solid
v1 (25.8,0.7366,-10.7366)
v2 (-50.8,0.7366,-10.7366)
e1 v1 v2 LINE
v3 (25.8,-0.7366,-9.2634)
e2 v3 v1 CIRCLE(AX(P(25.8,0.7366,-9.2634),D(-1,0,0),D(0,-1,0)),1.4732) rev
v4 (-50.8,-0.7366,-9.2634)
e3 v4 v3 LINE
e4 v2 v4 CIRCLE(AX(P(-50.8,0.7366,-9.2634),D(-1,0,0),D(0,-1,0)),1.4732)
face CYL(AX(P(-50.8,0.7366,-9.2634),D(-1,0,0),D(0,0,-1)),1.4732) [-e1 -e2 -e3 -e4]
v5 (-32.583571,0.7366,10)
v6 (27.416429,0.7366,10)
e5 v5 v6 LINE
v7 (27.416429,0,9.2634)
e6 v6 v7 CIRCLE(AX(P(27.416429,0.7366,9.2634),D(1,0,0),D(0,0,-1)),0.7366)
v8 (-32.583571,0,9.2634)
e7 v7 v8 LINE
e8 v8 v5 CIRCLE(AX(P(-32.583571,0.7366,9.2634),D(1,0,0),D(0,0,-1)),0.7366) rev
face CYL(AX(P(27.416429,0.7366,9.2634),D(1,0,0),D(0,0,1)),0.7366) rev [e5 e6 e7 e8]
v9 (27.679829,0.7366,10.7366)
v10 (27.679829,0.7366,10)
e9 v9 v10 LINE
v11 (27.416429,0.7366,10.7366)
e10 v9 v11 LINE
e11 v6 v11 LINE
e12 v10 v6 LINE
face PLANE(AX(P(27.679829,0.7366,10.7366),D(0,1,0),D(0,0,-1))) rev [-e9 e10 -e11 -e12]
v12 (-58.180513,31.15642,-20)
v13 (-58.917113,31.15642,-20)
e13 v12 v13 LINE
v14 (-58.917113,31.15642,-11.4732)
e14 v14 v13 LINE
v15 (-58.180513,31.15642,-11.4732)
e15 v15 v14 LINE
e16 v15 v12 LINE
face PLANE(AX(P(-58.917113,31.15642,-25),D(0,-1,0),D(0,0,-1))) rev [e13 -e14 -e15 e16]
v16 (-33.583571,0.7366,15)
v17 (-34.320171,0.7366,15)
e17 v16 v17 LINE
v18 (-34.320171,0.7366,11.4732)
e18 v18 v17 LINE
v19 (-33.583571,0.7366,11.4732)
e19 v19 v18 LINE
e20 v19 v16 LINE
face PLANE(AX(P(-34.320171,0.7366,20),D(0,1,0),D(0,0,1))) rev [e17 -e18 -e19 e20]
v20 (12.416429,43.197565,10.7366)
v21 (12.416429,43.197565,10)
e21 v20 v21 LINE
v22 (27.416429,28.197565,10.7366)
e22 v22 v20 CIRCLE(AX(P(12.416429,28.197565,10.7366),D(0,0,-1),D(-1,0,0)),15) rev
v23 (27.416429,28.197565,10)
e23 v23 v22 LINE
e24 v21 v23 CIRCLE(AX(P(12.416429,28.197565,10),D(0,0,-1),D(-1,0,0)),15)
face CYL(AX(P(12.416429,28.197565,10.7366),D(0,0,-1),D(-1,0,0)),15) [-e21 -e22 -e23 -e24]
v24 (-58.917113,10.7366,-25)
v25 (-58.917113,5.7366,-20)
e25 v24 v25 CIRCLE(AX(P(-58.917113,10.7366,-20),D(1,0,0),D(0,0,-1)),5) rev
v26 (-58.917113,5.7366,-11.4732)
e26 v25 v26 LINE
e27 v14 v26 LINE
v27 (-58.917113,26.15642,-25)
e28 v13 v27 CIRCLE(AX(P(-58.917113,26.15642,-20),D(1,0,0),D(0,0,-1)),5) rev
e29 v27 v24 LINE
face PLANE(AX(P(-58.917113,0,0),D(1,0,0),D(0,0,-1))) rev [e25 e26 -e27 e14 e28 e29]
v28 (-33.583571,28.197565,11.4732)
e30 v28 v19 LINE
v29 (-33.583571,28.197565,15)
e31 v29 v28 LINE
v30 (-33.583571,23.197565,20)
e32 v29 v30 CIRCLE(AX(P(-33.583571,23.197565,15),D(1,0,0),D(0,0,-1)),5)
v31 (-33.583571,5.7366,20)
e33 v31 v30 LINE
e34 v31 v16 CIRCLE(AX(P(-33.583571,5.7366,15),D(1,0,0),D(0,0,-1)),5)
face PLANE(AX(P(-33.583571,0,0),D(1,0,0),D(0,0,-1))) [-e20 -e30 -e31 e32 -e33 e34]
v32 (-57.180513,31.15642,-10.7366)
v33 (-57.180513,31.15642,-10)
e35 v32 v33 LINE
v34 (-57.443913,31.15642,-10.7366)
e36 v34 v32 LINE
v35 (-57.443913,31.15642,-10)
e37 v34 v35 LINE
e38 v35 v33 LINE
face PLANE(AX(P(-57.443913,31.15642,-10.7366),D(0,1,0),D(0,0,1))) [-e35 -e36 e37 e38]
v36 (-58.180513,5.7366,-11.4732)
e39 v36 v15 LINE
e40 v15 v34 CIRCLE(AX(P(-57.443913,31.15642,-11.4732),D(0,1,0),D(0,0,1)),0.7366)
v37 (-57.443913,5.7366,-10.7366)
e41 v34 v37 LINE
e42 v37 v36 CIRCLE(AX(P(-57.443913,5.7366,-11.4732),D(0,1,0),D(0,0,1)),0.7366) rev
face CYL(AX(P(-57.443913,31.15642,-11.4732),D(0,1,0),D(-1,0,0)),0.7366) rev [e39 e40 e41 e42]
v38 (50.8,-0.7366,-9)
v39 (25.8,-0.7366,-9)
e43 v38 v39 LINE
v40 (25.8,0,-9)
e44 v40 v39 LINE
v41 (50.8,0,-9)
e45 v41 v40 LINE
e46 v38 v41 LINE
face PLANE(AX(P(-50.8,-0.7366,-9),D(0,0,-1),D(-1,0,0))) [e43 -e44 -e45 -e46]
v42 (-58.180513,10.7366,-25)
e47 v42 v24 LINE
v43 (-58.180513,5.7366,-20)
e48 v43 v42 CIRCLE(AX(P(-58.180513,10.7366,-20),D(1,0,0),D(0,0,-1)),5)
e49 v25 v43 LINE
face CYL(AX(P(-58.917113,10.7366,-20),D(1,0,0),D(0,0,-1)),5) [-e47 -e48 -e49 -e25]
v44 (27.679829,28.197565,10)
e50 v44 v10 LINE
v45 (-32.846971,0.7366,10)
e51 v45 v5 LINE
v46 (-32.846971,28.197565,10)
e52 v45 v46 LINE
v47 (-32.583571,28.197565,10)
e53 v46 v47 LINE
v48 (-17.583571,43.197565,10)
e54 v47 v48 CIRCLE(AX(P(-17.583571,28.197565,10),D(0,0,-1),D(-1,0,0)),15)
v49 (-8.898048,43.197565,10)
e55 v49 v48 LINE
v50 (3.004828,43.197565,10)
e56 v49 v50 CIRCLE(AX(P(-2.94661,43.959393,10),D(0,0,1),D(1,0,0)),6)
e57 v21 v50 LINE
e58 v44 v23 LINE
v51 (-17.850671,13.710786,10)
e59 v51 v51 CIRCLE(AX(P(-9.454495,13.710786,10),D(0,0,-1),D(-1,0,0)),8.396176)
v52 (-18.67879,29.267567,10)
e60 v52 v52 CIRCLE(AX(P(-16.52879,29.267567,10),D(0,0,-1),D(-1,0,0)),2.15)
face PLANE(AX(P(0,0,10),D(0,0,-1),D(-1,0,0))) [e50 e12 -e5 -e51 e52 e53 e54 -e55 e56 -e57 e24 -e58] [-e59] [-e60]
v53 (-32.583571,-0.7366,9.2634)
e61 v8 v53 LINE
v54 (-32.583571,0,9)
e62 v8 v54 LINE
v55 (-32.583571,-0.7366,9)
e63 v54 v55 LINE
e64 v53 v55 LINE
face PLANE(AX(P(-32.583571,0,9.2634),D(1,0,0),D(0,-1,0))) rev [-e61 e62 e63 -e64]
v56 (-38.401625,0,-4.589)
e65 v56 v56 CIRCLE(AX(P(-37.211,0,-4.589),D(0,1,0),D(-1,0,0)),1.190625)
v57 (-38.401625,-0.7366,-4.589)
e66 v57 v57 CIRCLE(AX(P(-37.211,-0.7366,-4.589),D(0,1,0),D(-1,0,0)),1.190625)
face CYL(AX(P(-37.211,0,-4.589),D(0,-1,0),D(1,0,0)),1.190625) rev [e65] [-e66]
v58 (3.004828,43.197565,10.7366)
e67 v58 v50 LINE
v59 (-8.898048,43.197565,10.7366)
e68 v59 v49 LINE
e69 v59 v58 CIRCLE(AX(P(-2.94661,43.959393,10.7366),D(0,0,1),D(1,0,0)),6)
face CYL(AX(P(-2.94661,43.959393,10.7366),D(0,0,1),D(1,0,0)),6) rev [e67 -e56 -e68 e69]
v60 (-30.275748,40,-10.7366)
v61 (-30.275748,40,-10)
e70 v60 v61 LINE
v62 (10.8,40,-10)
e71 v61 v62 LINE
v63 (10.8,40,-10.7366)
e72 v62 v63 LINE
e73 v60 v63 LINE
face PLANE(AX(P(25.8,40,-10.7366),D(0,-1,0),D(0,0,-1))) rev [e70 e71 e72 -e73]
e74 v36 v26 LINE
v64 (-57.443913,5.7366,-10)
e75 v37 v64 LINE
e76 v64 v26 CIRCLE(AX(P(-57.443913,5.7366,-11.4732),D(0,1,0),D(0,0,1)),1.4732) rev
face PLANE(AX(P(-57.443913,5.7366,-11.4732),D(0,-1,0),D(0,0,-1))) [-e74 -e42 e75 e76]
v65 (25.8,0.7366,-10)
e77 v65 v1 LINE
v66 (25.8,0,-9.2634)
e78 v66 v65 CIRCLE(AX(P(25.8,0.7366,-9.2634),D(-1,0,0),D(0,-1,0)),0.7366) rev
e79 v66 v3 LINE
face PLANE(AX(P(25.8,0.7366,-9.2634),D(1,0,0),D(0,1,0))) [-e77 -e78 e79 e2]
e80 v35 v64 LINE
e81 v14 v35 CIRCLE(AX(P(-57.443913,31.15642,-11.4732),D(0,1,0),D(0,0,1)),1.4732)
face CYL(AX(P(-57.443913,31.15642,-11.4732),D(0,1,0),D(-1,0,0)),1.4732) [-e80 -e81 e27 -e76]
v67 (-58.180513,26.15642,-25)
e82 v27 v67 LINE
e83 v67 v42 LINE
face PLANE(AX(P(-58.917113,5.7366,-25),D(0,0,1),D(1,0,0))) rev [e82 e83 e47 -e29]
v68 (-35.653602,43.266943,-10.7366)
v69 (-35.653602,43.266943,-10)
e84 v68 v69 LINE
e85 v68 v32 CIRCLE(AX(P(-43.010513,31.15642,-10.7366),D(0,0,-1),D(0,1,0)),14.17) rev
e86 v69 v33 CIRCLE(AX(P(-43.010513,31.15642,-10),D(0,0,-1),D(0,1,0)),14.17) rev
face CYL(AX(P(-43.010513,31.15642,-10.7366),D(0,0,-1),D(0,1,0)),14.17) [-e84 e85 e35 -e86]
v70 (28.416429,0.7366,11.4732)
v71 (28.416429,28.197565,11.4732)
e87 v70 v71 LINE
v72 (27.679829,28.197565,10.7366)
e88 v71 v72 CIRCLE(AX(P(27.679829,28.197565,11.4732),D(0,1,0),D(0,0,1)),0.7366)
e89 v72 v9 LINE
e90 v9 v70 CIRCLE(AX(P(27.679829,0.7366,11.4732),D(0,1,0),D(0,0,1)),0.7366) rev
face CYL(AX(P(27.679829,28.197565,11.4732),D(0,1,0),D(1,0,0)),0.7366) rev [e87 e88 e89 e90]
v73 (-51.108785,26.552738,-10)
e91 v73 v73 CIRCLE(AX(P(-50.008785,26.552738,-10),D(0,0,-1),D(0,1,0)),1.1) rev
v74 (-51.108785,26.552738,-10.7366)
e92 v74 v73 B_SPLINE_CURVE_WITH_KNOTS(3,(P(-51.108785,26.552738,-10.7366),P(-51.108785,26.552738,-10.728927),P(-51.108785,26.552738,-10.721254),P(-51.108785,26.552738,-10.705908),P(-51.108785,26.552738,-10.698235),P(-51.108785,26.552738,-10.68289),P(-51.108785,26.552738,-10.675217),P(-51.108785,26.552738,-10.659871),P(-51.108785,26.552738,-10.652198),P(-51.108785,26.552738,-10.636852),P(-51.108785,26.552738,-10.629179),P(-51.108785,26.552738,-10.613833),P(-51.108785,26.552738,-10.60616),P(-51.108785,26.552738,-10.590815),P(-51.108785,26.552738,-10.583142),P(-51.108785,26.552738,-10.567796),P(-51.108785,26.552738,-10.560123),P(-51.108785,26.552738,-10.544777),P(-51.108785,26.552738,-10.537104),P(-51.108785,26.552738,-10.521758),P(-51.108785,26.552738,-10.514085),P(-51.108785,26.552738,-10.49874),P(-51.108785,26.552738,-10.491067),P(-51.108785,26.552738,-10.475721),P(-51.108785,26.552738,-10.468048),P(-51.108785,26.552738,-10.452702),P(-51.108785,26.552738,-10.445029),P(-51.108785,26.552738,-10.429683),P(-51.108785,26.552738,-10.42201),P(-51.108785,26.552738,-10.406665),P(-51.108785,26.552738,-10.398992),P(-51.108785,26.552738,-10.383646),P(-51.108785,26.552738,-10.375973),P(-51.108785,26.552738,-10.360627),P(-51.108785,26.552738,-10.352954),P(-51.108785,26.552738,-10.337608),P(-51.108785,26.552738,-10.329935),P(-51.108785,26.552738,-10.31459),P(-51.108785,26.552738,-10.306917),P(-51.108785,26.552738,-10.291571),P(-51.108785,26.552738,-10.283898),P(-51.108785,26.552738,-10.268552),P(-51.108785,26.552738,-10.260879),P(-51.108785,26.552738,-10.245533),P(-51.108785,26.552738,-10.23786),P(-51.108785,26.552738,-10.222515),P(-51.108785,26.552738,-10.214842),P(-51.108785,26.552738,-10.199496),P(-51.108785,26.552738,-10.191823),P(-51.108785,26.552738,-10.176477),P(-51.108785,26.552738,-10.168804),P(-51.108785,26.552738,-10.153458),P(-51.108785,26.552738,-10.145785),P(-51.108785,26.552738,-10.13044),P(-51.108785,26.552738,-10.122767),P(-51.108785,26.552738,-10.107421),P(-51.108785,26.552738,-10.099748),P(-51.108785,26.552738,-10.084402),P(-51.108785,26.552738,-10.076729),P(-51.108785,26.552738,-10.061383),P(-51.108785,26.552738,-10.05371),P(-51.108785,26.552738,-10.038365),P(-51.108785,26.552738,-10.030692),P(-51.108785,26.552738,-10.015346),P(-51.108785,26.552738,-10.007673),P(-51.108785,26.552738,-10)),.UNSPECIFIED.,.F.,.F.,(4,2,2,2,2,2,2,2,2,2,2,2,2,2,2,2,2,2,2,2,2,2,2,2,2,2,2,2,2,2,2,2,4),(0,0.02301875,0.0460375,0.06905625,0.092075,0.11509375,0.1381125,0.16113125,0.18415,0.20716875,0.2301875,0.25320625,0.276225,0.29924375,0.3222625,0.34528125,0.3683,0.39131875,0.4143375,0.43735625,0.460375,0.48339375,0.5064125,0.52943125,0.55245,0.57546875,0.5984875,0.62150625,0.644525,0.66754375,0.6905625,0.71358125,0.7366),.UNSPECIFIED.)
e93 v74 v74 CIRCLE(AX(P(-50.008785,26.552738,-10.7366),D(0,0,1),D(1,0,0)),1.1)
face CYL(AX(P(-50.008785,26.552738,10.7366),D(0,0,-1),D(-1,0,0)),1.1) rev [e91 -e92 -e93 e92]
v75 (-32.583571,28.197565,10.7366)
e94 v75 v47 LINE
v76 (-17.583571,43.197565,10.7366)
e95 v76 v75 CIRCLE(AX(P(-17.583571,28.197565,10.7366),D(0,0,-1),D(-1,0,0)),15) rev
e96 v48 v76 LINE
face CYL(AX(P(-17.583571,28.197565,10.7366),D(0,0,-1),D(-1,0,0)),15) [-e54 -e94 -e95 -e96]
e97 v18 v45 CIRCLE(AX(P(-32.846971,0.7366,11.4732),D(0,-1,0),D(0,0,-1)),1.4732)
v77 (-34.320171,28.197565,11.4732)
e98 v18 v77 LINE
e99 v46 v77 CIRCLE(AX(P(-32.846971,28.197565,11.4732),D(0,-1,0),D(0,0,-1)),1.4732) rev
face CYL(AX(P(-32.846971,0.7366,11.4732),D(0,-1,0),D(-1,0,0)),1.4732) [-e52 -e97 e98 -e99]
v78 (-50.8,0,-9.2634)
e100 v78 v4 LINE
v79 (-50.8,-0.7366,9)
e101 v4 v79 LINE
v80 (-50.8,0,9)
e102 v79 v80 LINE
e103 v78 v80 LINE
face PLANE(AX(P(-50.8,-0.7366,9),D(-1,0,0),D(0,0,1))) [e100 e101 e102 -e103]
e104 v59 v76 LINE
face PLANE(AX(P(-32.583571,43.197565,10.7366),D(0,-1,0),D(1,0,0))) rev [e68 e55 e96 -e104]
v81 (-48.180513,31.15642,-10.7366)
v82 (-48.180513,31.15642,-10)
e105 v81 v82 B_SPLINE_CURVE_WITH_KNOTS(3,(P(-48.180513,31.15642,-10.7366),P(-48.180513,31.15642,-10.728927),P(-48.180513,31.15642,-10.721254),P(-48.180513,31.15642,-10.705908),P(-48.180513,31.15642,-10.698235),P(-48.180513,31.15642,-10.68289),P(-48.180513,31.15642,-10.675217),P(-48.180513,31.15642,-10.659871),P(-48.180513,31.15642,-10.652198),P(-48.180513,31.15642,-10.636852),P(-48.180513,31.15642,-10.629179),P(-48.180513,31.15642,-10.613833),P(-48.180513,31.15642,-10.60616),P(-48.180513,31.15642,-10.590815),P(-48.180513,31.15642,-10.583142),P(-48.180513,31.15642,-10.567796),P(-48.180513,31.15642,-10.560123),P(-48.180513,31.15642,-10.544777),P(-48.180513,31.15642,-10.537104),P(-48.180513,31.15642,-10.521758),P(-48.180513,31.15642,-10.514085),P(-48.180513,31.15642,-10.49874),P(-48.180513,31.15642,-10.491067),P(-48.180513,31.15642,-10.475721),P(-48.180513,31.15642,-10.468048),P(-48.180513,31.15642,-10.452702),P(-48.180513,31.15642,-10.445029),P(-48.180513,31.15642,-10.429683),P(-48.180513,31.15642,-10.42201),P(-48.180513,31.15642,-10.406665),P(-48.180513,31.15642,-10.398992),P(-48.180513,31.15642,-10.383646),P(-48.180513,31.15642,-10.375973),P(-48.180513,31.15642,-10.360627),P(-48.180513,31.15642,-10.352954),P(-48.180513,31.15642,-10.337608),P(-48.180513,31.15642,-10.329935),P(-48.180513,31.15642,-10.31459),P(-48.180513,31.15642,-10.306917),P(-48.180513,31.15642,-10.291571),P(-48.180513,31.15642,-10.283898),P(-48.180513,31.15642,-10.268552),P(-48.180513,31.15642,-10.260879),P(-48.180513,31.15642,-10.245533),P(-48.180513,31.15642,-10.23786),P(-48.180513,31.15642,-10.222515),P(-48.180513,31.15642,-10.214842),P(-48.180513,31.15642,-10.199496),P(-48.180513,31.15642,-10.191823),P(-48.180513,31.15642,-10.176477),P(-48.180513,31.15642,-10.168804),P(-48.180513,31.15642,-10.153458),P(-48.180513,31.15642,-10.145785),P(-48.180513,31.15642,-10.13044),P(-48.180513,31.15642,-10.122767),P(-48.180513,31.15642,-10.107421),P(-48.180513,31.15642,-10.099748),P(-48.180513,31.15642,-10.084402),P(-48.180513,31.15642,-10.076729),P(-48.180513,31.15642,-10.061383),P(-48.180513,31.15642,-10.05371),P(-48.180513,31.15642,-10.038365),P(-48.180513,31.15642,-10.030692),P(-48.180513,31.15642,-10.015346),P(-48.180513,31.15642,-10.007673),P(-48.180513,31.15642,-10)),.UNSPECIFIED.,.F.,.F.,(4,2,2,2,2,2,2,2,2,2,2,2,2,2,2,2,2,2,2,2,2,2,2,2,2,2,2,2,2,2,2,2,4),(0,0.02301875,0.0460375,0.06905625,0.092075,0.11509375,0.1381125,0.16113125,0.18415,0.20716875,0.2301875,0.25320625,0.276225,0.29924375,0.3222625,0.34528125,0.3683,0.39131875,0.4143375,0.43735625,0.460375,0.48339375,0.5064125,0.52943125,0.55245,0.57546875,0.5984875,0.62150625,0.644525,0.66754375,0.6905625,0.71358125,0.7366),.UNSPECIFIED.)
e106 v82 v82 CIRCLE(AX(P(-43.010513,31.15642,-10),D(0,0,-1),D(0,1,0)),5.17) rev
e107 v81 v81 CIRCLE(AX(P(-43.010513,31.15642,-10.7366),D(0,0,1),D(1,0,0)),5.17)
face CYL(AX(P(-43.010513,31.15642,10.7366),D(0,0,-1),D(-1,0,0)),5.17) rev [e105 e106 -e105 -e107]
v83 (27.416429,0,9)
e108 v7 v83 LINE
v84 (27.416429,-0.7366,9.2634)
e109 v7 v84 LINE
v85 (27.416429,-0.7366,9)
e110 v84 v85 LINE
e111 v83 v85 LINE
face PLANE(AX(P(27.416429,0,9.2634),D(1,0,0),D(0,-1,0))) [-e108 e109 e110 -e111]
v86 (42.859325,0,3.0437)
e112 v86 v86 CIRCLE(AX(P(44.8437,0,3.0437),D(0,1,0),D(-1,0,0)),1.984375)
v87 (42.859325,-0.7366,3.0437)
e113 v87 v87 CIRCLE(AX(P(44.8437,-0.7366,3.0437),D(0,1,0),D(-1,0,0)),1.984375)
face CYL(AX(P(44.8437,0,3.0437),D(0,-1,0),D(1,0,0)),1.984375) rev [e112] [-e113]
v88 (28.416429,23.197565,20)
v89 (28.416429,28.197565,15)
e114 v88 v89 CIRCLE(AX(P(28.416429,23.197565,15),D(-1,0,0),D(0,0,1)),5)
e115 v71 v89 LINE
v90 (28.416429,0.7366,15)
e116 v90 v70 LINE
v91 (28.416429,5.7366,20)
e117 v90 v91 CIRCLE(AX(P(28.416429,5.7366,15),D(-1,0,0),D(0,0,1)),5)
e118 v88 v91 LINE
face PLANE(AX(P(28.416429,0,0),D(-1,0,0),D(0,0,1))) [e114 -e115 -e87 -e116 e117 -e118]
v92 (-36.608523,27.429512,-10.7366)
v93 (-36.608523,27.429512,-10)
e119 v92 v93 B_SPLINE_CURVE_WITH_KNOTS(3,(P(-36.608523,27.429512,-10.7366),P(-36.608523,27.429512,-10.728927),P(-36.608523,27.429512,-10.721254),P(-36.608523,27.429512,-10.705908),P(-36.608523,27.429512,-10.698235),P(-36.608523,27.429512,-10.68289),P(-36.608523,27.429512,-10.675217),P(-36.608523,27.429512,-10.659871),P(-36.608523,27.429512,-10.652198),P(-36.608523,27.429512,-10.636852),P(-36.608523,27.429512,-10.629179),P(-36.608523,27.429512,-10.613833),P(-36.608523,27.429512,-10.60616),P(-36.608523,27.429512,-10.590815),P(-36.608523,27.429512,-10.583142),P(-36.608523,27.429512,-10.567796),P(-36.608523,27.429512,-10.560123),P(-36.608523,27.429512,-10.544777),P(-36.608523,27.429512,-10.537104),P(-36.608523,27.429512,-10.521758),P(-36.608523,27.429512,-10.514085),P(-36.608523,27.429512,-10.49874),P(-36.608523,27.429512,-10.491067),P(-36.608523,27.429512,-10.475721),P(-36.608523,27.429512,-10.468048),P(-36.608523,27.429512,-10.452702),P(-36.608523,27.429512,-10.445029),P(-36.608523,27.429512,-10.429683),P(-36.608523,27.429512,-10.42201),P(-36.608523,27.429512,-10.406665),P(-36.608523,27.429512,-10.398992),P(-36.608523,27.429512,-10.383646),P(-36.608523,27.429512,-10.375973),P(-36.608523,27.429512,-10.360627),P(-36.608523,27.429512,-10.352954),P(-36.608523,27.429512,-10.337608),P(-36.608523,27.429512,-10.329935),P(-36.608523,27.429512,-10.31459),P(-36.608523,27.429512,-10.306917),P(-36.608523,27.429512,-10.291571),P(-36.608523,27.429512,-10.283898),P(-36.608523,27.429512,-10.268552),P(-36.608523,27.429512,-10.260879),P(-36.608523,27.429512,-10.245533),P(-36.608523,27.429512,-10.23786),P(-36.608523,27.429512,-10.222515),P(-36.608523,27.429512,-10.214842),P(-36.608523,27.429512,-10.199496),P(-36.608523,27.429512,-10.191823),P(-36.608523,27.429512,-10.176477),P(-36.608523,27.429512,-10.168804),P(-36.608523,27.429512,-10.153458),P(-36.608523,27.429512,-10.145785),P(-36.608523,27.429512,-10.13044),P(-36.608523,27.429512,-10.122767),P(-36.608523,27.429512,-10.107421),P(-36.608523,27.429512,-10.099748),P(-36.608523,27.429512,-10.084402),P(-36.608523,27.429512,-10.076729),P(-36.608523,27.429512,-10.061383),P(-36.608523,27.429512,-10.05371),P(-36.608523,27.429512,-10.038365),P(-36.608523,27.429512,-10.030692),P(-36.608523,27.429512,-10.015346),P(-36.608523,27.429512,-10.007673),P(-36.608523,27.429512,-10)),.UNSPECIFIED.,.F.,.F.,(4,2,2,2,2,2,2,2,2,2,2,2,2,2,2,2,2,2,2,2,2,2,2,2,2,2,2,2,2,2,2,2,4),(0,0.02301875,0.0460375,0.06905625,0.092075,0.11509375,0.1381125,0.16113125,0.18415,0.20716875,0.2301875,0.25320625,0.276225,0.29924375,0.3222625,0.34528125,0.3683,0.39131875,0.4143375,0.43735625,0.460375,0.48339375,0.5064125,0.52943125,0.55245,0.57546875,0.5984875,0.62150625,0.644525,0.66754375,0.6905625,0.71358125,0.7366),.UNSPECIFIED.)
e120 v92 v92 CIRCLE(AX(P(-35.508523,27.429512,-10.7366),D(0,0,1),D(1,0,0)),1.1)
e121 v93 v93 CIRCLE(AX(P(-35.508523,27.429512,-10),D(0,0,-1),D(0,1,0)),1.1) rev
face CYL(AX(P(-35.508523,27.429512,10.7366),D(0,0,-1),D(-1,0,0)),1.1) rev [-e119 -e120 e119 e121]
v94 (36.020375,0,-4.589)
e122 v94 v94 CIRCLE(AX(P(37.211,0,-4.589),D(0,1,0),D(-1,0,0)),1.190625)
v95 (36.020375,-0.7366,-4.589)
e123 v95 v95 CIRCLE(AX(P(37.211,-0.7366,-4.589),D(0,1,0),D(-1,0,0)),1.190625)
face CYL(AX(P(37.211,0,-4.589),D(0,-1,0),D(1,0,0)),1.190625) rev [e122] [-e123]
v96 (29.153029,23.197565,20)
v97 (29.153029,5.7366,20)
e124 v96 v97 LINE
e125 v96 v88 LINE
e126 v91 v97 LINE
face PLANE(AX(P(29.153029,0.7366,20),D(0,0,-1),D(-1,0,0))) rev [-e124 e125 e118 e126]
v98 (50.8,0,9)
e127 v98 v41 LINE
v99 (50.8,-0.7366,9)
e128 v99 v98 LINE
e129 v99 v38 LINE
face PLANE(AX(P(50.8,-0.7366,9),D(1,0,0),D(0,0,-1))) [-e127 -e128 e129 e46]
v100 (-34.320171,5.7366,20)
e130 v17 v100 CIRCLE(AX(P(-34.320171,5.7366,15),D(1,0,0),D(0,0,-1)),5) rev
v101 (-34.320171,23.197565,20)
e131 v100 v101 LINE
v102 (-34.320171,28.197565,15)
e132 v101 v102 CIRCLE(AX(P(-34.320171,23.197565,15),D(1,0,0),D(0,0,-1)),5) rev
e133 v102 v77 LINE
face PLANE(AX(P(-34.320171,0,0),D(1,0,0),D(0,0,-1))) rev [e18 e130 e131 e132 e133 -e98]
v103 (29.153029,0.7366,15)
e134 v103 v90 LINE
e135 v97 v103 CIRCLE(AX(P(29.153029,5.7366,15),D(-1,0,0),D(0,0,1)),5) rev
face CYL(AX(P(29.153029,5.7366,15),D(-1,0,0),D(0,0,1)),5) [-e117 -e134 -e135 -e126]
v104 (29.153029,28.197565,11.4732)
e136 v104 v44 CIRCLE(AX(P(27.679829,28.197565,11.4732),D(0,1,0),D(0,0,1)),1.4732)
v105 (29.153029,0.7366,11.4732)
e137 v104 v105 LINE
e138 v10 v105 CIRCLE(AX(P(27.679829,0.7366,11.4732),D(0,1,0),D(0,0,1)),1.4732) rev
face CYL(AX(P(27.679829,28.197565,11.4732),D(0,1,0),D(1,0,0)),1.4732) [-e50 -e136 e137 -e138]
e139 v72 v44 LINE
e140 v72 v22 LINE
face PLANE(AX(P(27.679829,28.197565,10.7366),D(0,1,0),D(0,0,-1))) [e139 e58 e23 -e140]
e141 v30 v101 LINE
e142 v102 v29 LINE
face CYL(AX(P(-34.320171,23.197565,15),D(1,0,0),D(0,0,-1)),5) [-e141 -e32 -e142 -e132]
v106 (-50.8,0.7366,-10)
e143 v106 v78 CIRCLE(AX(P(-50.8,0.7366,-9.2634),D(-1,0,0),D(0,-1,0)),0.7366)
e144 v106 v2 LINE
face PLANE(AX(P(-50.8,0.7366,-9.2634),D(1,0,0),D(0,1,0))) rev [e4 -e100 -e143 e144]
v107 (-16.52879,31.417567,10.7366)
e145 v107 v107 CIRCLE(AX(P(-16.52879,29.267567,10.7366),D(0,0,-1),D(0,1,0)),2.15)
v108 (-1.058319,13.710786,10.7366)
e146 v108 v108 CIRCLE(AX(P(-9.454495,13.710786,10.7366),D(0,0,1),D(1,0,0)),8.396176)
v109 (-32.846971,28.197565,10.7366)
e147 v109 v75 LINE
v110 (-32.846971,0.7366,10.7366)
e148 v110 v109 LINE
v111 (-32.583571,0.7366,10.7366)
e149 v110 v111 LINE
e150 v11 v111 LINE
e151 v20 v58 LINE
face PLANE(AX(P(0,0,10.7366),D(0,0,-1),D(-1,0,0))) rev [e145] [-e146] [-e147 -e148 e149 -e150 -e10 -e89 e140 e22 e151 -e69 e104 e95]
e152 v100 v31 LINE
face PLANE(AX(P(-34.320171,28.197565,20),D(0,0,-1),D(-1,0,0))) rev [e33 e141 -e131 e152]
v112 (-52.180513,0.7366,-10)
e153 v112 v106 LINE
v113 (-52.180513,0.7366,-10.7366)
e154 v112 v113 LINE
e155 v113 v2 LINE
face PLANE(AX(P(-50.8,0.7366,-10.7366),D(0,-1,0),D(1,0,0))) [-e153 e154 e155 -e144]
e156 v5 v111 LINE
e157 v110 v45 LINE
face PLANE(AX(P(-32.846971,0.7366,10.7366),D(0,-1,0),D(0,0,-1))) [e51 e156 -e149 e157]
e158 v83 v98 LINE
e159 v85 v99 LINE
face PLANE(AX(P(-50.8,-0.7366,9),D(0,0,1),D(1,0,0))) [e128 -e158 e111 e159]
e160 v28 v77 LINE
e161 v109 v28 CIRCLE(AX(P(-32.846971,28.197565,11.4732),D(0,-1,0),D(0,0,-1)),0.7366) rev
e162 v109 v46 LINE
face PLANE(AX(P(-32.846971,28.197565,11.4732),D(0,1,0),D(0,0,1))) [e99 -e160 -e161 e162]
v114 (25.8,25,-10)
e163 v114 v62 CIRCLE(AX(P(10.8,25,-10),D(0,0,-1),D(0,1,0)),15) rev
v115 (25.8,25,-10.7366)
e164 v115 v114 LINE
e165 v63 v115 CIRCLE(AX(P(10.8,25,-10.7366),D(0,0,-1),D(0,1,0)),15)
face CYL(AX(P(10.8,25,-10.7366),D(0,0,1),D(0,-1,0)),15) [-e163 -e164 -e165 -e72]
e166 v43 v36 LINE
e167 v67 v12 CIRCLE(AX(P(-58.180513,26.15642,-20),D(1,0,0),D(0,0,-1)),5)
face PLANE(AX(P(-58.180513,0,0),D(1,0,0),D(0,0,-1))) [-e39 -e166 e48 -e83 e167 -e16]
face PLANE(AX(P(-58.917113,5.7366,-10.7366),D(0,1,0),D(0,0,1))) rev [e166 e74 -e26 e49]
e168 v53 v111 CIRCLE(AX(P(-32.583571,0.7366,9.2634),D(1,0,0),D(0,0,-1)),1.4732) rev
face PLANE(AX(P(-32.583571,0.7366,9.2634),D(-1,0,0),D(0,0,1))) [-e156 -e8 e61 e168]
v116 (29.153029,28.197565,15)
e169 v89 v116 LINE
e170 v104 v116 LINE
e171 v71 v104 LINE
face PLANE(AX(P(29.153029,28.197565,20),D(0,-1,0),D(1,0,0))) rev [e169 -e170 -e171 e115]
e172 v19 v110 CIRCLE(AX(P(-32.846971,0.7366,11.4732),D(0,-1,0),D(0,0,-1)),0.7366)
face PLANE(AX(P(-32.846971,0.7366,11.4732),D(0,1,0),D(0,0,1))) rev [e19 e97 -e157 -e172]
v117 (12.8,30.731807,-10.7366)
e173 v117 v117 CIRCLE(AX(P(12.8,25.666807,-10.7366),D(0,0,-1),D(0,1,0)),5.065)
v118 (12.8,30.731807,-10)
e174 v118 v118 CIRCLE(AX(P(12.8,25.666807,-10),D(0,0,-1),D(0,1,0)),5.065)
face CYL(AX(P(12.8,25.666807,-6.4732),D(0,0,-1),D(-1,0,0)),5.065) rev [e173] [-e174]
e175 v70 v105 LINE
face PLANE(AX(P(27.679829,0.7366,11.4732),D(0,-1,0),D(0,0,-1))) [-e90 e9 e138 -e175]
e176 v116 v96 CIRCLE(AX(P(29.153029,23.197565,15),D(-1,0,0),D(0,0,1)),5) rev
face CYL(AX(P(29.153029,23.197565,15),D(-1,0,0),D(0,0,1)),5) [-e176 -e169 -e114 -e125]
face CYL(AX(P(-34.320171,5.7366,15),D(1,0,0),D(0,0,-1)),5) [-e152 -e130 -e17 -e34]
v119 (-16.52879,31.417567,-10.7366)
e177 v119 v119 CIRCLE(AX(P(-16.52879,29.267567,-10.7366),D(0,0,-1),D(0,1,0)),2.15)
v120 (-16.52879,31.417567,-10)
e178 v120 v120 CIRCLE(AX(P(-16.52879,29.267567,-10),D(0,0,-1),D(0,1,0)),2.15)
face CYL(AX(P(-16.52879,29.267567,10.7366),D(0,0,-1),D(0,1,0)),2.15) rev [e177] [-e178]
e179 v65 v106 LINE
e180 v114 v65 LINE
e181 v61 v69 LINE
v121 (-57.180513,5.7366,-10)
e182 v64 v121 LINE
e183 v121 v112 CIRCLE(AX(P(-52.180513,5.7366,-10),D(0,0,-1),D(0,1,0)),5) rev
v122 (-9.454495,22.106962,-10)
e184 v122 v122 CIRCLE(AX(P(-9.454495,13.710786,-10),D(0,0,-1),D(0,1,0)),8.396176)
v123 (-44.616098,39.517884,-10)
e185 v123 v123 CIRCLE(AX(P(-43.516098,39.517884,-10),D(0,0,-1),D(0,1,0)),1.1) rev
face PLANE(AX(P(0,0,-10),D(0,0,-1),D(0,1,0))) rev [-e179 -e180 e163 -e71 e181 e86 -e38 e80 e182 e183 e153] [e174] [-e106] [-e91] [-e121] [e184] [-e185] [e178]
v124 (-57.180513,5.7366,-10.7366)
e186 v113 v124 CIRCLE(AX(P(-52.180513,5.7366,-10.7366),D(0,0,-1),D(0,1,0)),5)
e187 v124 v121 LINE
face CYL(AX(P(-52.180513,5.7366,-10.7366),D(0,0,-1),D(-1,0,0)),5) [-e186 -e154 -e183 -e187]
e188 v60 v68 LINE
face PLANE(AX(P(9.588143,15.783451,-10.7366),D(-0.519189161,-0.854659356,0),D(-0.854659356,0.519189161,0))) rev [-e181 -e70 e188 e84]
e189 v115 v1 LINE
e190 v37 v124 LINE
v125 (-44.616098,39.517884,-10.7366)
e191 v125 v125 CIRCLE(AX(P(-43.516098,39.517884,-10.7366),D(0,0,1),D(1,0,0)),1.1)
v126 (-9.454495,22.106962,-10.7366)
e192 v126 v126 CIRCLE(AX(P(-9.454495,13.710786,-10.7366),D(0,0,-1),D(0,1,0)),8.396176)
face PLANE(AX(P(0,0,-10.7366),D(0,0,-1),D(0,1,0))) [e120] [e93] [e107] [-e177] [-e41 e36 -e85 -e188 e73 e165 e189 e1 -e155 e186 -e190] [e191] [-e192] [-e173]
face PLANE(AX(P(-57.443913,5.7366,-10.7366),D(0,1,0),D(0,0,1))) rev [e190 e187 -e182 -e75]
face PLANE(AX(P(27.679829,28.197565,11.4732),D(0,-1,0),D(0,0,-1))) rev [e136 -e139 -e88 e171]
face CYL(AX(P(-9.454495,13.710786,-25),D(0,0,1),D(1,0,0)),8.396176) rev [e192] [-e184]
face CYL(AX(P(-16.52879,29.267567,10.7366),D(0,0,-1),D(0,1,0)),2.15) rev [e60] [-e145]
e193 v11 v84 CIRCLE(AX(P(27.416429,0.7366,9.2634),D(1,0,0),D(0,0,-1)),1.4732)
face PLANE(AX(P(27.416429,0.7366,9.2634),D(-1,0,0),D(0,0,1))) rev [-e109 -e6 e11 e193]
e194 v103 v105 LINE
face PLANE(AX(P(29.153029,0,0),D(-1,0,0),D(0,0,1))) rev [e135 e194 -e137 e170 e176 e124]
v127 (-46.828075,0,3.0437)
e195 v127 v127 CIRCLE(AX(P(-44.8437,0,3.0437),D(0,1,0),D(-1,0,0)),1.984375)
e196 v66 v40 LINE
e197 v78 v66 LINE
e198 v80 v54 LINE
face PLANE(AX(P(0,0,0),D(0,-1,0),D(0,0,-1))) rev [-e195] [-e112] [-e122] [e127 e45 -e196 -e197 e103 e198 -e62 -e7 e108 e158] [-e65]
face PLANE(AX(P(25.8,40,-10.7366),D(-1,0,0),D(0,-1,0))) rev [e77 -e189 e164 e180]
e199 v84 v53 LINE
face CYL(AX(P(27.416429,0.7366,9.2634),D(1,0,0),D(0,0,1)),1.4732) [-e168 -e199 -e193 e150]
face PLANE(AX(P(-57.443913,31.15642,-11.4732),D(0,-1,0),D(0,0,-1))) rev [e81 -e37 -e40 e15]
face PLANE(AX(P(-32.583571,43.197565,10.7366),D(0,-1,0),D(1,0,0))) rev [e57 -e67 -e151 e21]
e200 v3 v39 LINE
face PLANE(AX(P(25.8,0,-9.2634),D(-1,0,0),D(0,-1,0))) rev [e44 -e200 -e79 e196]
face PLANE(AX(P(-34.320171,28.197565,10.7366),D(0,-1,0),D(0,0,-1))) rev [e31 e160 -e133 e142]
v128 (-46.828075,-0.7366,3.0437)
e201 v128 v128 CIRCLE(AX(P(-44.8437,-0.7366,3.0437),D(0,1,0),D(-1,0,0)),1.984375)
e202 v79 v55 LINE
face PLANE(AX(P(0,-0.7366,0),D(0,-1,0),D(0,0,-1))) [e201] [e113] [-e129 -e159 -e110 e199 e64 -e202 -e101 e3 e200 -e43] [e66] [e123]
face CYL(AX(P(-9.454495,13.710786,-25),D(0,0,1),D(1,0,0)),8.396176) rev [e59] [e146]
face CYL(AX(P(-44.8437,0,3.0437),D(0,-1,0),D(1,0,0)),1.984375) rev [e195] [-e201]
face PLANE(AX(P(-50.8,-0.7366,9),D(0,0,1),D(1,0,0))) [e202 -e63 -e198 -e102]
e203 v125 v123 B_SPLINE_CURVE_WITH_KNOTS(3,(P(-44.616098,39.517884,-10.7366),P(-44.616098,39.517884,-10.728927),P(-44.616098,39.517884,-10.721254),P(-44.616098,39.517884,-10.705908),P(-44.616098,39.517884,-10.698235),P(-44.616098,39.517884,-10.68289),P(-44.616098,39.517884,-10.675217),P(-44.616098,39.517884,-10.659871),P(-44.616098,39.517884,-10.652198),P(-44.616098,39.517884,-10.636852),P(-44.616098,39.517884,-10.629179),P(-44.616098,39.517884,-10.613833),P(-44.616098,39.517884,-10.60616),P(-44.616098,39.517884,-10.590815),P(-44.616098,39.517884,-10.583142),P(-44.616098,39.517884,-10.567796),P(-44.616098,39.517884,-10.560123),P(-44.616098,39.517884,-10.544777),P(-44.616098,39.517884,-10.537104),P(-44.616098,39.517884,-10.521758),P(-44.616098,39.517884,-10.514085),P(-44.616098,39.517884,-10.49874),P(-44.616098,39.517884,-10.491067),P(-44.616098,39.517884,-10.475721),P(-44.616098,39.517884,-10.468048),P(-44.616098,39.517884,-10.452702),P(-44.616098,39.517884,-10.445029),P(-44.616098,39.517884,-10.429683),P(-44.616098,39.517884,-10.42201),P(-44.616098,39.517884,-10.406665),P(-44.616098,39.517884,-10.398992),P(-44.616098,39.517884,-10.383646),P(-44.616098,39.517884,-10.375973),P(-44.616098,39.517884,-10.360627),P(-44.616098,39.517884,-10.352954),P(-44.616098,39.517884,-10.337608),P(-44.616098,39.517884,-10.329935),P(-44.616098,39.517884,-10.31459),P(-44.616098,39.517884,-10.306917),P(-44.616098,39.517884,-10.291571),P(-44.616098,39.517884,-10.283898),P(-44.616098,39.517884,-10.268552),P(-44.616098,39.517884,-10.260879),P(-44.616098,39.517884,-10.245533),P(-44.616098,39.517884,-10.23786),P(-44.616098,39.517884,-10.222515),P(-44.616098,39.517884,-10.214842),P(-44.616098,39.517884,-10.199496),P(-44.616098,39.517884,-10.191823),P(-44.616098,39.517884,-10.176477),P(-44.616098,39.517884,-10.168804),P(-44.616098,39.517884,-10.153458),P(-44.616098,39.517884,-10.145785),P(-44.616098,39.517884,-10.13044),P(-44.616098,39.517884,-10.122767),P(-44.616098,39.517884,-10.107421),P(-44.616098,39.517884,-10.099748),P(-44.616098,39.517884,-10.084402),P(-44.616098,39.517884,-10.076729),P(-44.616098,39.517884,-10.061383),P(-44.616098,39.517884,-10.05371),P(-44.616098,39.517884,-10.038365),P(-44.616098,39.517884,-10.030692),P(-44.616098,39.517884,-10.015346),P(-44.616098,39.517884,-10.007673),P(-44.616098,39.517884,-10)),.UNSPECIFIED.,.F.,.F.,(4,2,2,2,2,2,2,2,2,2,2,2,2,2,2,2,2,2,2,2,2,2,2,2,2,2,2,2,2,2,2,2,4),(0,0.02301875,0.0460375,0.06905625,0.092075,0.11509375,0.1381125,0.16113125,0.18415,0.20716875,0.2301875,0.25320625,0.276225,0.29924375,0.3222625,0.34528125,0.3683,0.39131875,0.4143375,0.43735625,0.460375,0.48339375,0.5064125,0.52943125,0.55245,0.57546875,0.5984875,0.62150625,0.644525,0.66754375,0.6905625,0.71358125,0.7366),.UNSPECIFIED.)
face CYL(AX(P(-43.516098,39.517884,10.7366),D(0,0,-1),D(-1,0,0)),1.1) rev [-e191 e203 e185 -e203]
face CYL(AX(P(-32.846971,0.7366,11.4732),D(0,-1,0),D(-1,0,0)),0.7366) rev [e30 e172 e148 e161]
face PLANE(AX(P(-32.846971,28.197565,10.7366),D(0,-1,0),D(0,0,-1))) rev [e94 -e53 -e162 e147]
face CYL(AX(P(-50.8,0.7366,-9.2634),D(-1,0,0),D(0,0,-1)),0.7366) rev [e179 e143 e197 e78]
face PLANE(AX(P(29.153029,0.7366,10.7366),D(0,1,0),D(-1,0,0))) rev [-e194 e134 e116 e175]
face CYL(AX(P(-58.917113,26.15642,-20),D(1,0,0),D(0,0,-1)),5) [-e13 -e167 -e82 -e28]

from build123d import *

# Parameters (mm, degrees)
SKETCH1_W                = 101.6
SKETCH1_H                = 18
BASE_FLANGE1_DEPTH       = 0.7366
CUT_EXTRUDE1_DEPTH       = 248.362817644
CUT_EXTRUDE1_DEPTH_BACK  = 248.362817644
SKETCH9_R                = 1.984375
SKETCH9_R_2              = 1.190625
EDGE_FLANGE2_DEPTH       = 60
CUT_EXTRUDE10_DEPTH      = 276.770749451
CUT_EXTRUDE10_DEPTH_BACK = 276.770749451
SKETCH47_R               = 5.065
SKETCH48_R               = 6
CUT_EXTRUDE11_DEPTH      = 10
EDGE_FLANGE4_DEPTH       = 76.6
EDGE_FLANGE4_START       = 0.7366
EDGE_FLANGE4_FLAT_DEPTH  = 0.7366
CUT_EXTRUDE12_DEPTH      = 105.880550385
CUT_EXTRUDE12_DEPTH_BACK = 105.880550385
SKETCH52_R               = 2.15
TAB1_START               = -0.7366
TAB1_OUTLINE_W           = 10
TAB1_OUTLINE_H           = 49.408594005
TAB1_DEPTH               = 0.7366
SKETCH56_R               = 5.065
CUT_EXTRUDE13_DEPTH      = 5
CUT_EXTRUDE16_DEPTH      = 105.732220975
CUT_EXTRUDE16_DEPTH_BACK = 105.732220975
SKETCH59_R               = 1.1
SKETCH59_R_2             = 5.17
CUT_EXTRUDE18_DEPTH      = 10
FILLET1_R                = 5
EDGE_FLANGE5_DEPTH       = 25.419820015
FILLET2_R                = 5
FILLET3_R                = 15
EDGE_FLANGE6_DEPTH       = 27.460964596
EDGE_FLANGE6_BEND_DEPTH  = 27.460964596
FILLET4_R                = 5
SKETCH71_R               = 8.39617584
CUT_EXTRUDE19_DEPTH      = 83.479179892


# Read off the part's stored shape, not the designer's step: Tab1
# Sheet-metal steps are written as plain solids
with BuildPart() as part:
    # Sketch1 → Base-Flange1 (new body)
    with BuildSketch(Plane(origin=(0, 0, 0), x_dir=(1, 0, 0), z_dir=(0, 1, 0))):
        Rectangle(SKETCH1_W, SKETCH1_H)
    extrude(amount=-BASE_FLANGE1_DEPTH)

    # Sketch9 → Cut-Extrude1 (cut, two sides: drawn at the far end of the back side and taken through both)
    with BuildSketch(Plane(origin=(-165.711822879, -0.7366, -110.626299478), x_dir=(0.7071067811865437, 0, -0.7071067811865515), z_dir=(0, 1, 0)).offset(-CUT_EXTRUDE1_DEPTH_BACK)):
        with Locations(Location((5.089841868, -165.843496765, 0), (0, 0, 135))):
            Circle(SKETCH9_R)
        with Locations(Location((15.884109726, -165.843496765, 0), (0, 0, 135))):
            Circle(SKETCH9_R_2)
        with Locations(Location((68.508410595, -229.262065492, 0), (0, 0, 135))):
            Circle(SKETCH9_R)
        with Locations(Location((68.508410595, -218.467797635, 0), (0, 0, 135))):
            Circle(SKETCH9_R_2)
    extrude(amount=CUT_EXTRUDE1_DEPTH + CUT_EXTRUDE1_DEPTH_BACK, mode=Mode.SUBTRACT)

    # Edge-Flange2 section (across the edge) → Edge-Flange2 (add)
    with BuildSketch(Plane(origin=(-32.583570882, 0, 10), x_dir=(0, 0, -1), z_dir=(1, 0, 0))):
        with BuildLine():
            Line((-0.7366, 0.7366), (-0.7366, 43.197564596))
            Line((-0.7366, 43.197564596), (0, 43.197564596))
            Line((0, 43.197564596), (0, 0.7366))
            ThreePointArc((0, 0.7366), (0.215745145, 0.215745145), (0.7366, 0))
            Line((0.7366, 0), (1, 0))
            Line((1, 0), (1, -0.7366))
            Line((1, -0.7366), (0.7366, -0.7366))
            ThreePointArc((0.7366, -0.7366), (-0.30510971, -0.30510971), (-0.7366, 0.7366))
        make_face()
    extrude(amount=EDGE_FLANGE2_DEPTH)

    # Sketch47 → Cut-Extrude10 (cut, two sides: drawn at the far end of the back side and taken through both)
    with BuildSketch(Plane(origin=(-165.711822879, -125.530580752, -15.7766), x_dir=(1, 0, 0), z_dir=(0, 0, 1)).offset(-CUT_EXTRUDE10_DEPTH_BACK)):
        with Locations((162.765212711, 169.489973714)):
            Circle(SKETCH47_R)
    extrude(amount=CUT_EXTRUDE10_DEPTH + CUT_EXTRUDE10_DEPTH_BACK, mode=Mode.SUBTRACT)

    # Sketch48 → Cut-Extrude11 (cut)
    with BuildSketch(Plane.XY.offset(10.7366)):
        with Locations((-2.946610168, 43.959392962)):
            Circle(SKETCH48_R)
    extrude(amount=-CUT_EXTRUDE11_DEPTH, mode=Mode.SUBTRACT)

    # Edge-Flange4 bend section (across the edge) → Edge-Flange4 (add)
    with BuildSketch(Plane(origin=(25.8, 0, -10), x_dir=(0, 0, 1), z_dir=(-1, 0, 0))):
        with BuildLine():
            Line((-0.7366, 0.7366), (0, 0.7366))
            ThreePointArc((0, 0.7366), (0.215745145, 0.215745145), (0.7366, 0))
            Line((0.7366, 0), (1, 0))
            Line((1, 0), (1, -0.7366))
            Line((1, -0.7366), (0.7366, -0.7366))
            ThreePointArc((0.7366, -0.7366), (-0.30510971, -0.30510971), (-0.7366, 0.7366))
        make_face()
    extrude(amount=EDGE_FLANGE4_DEPTH)

    # Edge-Flange4 profile (on flange) → Edge-Flange4 flat (add)
    with BuildSketch(Plane(origin=(0, 0, -10), x_dir=(-1, 0, 0), z_dir=(0, 0, -1)).offset(EDGE_FLANGE4_START)):
        Polygon((-25.8, 40), (-25.8, 0.7366), (50.8, 0.7366), (50.8, 40), (50.8, 50.145194005), (30.27574847, 50.145194005), (30.27574847, 40), align=None)
    extrude(amount=-EDGE_FLANGE4_FLAT_DEPTH)

    # Sketch52 → Cut-Extrude12 (cut, two sides: drawn at the far end of the back side and taken through both)
    with BuildSketch(Plane(origin=(-25.053389833, -19.029185513, -10.7366), x_dir=(-1, 0, 0), z_dir=(0, 0, -1)).offset(-CUT_EXTRUDE12_DEPTH_BACK)):
        with Locations(Location((-8.524599638, 48.296752149, 0), (0, 0, 90))):
            Circle(SKETCH52_R)
    extrude(amount=CUT_EXTRUDE12_DEPTH + CUT_EXTRUDE12_DEPTH_BACK, mode=Mode.SUBTRACT)

    # Tab1 outline → Tab1 (add)
    with BuildSketch(Plane.XY.offset(-10).offset(TAB1_START)):
        with Locations((-55.8, 25.440897003)):
            Rectangle(TAB1_OUTLINE_W, TAB1_OUTLINE_H)
    extrude(amount=TAB1_DEPTH)

    # Sketch56 → Cut-Extrude13 (cut)
    with BuildSketch(Plane(origin=(-25.053389833, -19.029185513, -11.4732), x_dir=(-1, 0, 0), z_dir=(0, 0, -1))):
        with Locations(Location((-37.853389832, 44.695992962, 0), (0, 0, 90))):
            Circle(SKETCH56_R)
    extrude(amount=-CUT_EXTRUDE13_DEPTH, mode=Mode.SUBTRACT)

    # Sketch59 → Cut-Extrude16 (cut, two sides: drawn at the far end of the back side and taken through both)
    with BuildSketch(Plane(origin=(-25.053389833, -19.029185513, -10), x_dir=(1, 0, 0), z_dir=(0, 0, 1)).offset(-CUT_EXTRUDE16_DEPTH_BACK)):
        with Locations(Location((-24.955394773, 45.581923383, 0), (0, 0, 180))):
            Circle(SKETCH59_R)
        with Locations(Location((-17.957123001, 50.185605529, 0), (0, 0, 180))):
            Circle(SKETCH59_R_2)
        with Locations(Location((-18.462707804, 58.547069581, 0), (0, 0, 180))):
            Circle(SKETCH59_R)
        with Locations(Location((-10.455133223, 46.458697096, 0), (0, 0, 180))):
            Circle(SKETCH59_R)
    extrude(amount=CUT_EXTRUDE16_DEPTH + CUT_EXTRUDE16_DEPTH_BACK, mode=Mode.SUBTRACT)

    # Sketch61 → Cut-Extrude18 (cut)
    with BuildSketch(Plane.XY.offset(-10)):
        with BuildLine():
            Line((-57.180512833, 31.156420015), (-57.180512833, 0.7366))
            Line((-57.180512833, 0.7366), (-60.8, 0.7366))
            Line((-60.8, 0.7366), (-60.8, 50.145194005))
            Line((-60.8, 50.145194005), (-30.27574847, 50.145194005))
            Line((-30.27574847, 50.145194005), (-30.27574847, 40))
            Line((-30.27574847, 40), (-35.653602425, 43.266943094))
            ThreePointArc((-35.653602425, 43.266943094), (-49.958227548, 43.506244316), (-57.180512833, 31.156420015))
        make_face()
    extrude(amount=-CUT_EXTRUDE18_DEPTH, mode=Mode.SUBTRACT)

    # Fillet1
    fillet1_edges = [part.edges().sort_by_distance(p)[0] for p in [
        (-57.180512833, 0.7366, -10.3683),
    ]]
    fillet(fillet1_edges, radius=FILLET1_R)

    # Edge-Flange5 section (across the edge) → Edge-Flange5 (add)
    with BuildSketch(Plane(origin=(-58.180512833, 5.7366, -10.7366), x_dir=(1, 0, 0), z_dir=(0, 1, 0))):
        with BuildLine():
            Line((-0.7366, 0.7366), (-0.7366, 14.2634))
            Line((-0.7366, 14.2634), (0, 14.2634))
            Line((0, 14.2634), (0, 0.7366))
            ThreePointArc((0, 0.7366), (0.215745145, 0.215745145), (0.7366, 0))
            Line((0.7366, 0), (1, 0))
            Line((1, 0), (1, -0.7366))
            Line((1, -0.7366), (0.7366, -0.7366))
            ThreePointArc((0.7366, -0.7366), (-0.30510971, -0.30510971), (-0.7366, 0.7366))
        make_face()
    extrude(amount=EDGE_FLANGE5_DEPTH)

    # Fillet2
    fillet2_edges = [part.edges().sort_by_distance(p)[0] for p in [
        (-58.548812833, 5.7366, -25),
        (-58.548812833, 31.156420015, -25),
    ]]
    fillet(fillet2_edges, radius=FILLET2_R)

    # Fillet3
    fillet3_edges = [part.edges().sort_by_distance(p)[0] for p in [
        (25.8, 40, -10.3683),
        (-32.583570882, 43.197564596, 10.3683),
        (27.416429118, 43.197564596, 10.3683),
    ]]
    fillet(fillet3_edges, radius=FILLET3_R)

    # Edge-Flange6 section (across the edge) → Edge-Flange6 (add)
    with BuildSketch(Plane(origin=(28.416429118, 0.7366, 10.7366), x_dir=(-1, 0, 0), z_dir=(0, 1, 0))):
        with BuildLine():
            Line((-0.7366, 0.7366), (-0.7366, 9.2634))
            Line((-0.7366, 9.2634), (0, 9.2634))
            Line((0, 9.2634), (0, 0.7366))
            ThreePointArc((0, 0.7366), (0.215745145, 0.215745145), (0.7366, 0))
            Line((0.7366, 0), (1, 0))
            Line((1, 0), (1, -0.7366))
            Line((1, -0.7366), (0.7366, -0.7366))
            ThreePointArc((0.7366, -0.7366), (-0.30510971, -0.30510971), (-0.7366, 0.7366))
        make_face()
    extrude(amount=EDGE_FLANGE6_DEPTH)

    # Edge-Flange6 section 2 (across the edge) → Edge-Flange6 bend (add)
    with BuildSketch(Plane(origin=(-33.583570882, 28.197564596, 10.7366), x_dir=(1, 0, 0), z_dir=(0, -1, 0))):
        with BuildLine():
            Line((-0.7366, 0.7366), (-0.7366, 9.2634))
            Line((-0.7366, 9.2634), (0, 9.2634))
            Line((0, 9.2634), (0, 0.7366))
            ThreePointArc((0, 0.7366), (0.215745145, 0.215745145), (0.7366, 0))
            Line((0.7366, 0), (1, 0))
            Line((1, 0), (1, -0.7366))
            Line((1, -0.7366), (0.7366, -0.7366))
            ThreePointArc((0.7366, -0.7366), (-0.30510971, -0.30510971), (-0.7366, 0.7366))
        make_face()
    extrude(amount=EDGE_FLANGE6_BEND_DEPTH)

    # Fillet4
    fillet4_edges = [part.edges().sort_by_distance(p)[0] for p in [
        (28.784729118, 0.7366, 20),
        (28.784729118, 28.197564596, 20),
        (-33.951870882, 28.197564596, 20),
        (-33.951870882, 0.7366, 20),
    ]]
    fillet(fillet4_edges, radius=FILLET4_R)

    # Sketch71 → Cut-Extrude19 (cut, through all)
    with BuildSketch(Plane.XY.offset(10.7366)):
        with Locations((-9.454494987, 13.710785706)):
            Circle(SKETCH71_R)
    extrude(amount=-CUT_EXTRUDE19_DEPTH, mode=Mode.SUBTRACT)


solid = part.part
